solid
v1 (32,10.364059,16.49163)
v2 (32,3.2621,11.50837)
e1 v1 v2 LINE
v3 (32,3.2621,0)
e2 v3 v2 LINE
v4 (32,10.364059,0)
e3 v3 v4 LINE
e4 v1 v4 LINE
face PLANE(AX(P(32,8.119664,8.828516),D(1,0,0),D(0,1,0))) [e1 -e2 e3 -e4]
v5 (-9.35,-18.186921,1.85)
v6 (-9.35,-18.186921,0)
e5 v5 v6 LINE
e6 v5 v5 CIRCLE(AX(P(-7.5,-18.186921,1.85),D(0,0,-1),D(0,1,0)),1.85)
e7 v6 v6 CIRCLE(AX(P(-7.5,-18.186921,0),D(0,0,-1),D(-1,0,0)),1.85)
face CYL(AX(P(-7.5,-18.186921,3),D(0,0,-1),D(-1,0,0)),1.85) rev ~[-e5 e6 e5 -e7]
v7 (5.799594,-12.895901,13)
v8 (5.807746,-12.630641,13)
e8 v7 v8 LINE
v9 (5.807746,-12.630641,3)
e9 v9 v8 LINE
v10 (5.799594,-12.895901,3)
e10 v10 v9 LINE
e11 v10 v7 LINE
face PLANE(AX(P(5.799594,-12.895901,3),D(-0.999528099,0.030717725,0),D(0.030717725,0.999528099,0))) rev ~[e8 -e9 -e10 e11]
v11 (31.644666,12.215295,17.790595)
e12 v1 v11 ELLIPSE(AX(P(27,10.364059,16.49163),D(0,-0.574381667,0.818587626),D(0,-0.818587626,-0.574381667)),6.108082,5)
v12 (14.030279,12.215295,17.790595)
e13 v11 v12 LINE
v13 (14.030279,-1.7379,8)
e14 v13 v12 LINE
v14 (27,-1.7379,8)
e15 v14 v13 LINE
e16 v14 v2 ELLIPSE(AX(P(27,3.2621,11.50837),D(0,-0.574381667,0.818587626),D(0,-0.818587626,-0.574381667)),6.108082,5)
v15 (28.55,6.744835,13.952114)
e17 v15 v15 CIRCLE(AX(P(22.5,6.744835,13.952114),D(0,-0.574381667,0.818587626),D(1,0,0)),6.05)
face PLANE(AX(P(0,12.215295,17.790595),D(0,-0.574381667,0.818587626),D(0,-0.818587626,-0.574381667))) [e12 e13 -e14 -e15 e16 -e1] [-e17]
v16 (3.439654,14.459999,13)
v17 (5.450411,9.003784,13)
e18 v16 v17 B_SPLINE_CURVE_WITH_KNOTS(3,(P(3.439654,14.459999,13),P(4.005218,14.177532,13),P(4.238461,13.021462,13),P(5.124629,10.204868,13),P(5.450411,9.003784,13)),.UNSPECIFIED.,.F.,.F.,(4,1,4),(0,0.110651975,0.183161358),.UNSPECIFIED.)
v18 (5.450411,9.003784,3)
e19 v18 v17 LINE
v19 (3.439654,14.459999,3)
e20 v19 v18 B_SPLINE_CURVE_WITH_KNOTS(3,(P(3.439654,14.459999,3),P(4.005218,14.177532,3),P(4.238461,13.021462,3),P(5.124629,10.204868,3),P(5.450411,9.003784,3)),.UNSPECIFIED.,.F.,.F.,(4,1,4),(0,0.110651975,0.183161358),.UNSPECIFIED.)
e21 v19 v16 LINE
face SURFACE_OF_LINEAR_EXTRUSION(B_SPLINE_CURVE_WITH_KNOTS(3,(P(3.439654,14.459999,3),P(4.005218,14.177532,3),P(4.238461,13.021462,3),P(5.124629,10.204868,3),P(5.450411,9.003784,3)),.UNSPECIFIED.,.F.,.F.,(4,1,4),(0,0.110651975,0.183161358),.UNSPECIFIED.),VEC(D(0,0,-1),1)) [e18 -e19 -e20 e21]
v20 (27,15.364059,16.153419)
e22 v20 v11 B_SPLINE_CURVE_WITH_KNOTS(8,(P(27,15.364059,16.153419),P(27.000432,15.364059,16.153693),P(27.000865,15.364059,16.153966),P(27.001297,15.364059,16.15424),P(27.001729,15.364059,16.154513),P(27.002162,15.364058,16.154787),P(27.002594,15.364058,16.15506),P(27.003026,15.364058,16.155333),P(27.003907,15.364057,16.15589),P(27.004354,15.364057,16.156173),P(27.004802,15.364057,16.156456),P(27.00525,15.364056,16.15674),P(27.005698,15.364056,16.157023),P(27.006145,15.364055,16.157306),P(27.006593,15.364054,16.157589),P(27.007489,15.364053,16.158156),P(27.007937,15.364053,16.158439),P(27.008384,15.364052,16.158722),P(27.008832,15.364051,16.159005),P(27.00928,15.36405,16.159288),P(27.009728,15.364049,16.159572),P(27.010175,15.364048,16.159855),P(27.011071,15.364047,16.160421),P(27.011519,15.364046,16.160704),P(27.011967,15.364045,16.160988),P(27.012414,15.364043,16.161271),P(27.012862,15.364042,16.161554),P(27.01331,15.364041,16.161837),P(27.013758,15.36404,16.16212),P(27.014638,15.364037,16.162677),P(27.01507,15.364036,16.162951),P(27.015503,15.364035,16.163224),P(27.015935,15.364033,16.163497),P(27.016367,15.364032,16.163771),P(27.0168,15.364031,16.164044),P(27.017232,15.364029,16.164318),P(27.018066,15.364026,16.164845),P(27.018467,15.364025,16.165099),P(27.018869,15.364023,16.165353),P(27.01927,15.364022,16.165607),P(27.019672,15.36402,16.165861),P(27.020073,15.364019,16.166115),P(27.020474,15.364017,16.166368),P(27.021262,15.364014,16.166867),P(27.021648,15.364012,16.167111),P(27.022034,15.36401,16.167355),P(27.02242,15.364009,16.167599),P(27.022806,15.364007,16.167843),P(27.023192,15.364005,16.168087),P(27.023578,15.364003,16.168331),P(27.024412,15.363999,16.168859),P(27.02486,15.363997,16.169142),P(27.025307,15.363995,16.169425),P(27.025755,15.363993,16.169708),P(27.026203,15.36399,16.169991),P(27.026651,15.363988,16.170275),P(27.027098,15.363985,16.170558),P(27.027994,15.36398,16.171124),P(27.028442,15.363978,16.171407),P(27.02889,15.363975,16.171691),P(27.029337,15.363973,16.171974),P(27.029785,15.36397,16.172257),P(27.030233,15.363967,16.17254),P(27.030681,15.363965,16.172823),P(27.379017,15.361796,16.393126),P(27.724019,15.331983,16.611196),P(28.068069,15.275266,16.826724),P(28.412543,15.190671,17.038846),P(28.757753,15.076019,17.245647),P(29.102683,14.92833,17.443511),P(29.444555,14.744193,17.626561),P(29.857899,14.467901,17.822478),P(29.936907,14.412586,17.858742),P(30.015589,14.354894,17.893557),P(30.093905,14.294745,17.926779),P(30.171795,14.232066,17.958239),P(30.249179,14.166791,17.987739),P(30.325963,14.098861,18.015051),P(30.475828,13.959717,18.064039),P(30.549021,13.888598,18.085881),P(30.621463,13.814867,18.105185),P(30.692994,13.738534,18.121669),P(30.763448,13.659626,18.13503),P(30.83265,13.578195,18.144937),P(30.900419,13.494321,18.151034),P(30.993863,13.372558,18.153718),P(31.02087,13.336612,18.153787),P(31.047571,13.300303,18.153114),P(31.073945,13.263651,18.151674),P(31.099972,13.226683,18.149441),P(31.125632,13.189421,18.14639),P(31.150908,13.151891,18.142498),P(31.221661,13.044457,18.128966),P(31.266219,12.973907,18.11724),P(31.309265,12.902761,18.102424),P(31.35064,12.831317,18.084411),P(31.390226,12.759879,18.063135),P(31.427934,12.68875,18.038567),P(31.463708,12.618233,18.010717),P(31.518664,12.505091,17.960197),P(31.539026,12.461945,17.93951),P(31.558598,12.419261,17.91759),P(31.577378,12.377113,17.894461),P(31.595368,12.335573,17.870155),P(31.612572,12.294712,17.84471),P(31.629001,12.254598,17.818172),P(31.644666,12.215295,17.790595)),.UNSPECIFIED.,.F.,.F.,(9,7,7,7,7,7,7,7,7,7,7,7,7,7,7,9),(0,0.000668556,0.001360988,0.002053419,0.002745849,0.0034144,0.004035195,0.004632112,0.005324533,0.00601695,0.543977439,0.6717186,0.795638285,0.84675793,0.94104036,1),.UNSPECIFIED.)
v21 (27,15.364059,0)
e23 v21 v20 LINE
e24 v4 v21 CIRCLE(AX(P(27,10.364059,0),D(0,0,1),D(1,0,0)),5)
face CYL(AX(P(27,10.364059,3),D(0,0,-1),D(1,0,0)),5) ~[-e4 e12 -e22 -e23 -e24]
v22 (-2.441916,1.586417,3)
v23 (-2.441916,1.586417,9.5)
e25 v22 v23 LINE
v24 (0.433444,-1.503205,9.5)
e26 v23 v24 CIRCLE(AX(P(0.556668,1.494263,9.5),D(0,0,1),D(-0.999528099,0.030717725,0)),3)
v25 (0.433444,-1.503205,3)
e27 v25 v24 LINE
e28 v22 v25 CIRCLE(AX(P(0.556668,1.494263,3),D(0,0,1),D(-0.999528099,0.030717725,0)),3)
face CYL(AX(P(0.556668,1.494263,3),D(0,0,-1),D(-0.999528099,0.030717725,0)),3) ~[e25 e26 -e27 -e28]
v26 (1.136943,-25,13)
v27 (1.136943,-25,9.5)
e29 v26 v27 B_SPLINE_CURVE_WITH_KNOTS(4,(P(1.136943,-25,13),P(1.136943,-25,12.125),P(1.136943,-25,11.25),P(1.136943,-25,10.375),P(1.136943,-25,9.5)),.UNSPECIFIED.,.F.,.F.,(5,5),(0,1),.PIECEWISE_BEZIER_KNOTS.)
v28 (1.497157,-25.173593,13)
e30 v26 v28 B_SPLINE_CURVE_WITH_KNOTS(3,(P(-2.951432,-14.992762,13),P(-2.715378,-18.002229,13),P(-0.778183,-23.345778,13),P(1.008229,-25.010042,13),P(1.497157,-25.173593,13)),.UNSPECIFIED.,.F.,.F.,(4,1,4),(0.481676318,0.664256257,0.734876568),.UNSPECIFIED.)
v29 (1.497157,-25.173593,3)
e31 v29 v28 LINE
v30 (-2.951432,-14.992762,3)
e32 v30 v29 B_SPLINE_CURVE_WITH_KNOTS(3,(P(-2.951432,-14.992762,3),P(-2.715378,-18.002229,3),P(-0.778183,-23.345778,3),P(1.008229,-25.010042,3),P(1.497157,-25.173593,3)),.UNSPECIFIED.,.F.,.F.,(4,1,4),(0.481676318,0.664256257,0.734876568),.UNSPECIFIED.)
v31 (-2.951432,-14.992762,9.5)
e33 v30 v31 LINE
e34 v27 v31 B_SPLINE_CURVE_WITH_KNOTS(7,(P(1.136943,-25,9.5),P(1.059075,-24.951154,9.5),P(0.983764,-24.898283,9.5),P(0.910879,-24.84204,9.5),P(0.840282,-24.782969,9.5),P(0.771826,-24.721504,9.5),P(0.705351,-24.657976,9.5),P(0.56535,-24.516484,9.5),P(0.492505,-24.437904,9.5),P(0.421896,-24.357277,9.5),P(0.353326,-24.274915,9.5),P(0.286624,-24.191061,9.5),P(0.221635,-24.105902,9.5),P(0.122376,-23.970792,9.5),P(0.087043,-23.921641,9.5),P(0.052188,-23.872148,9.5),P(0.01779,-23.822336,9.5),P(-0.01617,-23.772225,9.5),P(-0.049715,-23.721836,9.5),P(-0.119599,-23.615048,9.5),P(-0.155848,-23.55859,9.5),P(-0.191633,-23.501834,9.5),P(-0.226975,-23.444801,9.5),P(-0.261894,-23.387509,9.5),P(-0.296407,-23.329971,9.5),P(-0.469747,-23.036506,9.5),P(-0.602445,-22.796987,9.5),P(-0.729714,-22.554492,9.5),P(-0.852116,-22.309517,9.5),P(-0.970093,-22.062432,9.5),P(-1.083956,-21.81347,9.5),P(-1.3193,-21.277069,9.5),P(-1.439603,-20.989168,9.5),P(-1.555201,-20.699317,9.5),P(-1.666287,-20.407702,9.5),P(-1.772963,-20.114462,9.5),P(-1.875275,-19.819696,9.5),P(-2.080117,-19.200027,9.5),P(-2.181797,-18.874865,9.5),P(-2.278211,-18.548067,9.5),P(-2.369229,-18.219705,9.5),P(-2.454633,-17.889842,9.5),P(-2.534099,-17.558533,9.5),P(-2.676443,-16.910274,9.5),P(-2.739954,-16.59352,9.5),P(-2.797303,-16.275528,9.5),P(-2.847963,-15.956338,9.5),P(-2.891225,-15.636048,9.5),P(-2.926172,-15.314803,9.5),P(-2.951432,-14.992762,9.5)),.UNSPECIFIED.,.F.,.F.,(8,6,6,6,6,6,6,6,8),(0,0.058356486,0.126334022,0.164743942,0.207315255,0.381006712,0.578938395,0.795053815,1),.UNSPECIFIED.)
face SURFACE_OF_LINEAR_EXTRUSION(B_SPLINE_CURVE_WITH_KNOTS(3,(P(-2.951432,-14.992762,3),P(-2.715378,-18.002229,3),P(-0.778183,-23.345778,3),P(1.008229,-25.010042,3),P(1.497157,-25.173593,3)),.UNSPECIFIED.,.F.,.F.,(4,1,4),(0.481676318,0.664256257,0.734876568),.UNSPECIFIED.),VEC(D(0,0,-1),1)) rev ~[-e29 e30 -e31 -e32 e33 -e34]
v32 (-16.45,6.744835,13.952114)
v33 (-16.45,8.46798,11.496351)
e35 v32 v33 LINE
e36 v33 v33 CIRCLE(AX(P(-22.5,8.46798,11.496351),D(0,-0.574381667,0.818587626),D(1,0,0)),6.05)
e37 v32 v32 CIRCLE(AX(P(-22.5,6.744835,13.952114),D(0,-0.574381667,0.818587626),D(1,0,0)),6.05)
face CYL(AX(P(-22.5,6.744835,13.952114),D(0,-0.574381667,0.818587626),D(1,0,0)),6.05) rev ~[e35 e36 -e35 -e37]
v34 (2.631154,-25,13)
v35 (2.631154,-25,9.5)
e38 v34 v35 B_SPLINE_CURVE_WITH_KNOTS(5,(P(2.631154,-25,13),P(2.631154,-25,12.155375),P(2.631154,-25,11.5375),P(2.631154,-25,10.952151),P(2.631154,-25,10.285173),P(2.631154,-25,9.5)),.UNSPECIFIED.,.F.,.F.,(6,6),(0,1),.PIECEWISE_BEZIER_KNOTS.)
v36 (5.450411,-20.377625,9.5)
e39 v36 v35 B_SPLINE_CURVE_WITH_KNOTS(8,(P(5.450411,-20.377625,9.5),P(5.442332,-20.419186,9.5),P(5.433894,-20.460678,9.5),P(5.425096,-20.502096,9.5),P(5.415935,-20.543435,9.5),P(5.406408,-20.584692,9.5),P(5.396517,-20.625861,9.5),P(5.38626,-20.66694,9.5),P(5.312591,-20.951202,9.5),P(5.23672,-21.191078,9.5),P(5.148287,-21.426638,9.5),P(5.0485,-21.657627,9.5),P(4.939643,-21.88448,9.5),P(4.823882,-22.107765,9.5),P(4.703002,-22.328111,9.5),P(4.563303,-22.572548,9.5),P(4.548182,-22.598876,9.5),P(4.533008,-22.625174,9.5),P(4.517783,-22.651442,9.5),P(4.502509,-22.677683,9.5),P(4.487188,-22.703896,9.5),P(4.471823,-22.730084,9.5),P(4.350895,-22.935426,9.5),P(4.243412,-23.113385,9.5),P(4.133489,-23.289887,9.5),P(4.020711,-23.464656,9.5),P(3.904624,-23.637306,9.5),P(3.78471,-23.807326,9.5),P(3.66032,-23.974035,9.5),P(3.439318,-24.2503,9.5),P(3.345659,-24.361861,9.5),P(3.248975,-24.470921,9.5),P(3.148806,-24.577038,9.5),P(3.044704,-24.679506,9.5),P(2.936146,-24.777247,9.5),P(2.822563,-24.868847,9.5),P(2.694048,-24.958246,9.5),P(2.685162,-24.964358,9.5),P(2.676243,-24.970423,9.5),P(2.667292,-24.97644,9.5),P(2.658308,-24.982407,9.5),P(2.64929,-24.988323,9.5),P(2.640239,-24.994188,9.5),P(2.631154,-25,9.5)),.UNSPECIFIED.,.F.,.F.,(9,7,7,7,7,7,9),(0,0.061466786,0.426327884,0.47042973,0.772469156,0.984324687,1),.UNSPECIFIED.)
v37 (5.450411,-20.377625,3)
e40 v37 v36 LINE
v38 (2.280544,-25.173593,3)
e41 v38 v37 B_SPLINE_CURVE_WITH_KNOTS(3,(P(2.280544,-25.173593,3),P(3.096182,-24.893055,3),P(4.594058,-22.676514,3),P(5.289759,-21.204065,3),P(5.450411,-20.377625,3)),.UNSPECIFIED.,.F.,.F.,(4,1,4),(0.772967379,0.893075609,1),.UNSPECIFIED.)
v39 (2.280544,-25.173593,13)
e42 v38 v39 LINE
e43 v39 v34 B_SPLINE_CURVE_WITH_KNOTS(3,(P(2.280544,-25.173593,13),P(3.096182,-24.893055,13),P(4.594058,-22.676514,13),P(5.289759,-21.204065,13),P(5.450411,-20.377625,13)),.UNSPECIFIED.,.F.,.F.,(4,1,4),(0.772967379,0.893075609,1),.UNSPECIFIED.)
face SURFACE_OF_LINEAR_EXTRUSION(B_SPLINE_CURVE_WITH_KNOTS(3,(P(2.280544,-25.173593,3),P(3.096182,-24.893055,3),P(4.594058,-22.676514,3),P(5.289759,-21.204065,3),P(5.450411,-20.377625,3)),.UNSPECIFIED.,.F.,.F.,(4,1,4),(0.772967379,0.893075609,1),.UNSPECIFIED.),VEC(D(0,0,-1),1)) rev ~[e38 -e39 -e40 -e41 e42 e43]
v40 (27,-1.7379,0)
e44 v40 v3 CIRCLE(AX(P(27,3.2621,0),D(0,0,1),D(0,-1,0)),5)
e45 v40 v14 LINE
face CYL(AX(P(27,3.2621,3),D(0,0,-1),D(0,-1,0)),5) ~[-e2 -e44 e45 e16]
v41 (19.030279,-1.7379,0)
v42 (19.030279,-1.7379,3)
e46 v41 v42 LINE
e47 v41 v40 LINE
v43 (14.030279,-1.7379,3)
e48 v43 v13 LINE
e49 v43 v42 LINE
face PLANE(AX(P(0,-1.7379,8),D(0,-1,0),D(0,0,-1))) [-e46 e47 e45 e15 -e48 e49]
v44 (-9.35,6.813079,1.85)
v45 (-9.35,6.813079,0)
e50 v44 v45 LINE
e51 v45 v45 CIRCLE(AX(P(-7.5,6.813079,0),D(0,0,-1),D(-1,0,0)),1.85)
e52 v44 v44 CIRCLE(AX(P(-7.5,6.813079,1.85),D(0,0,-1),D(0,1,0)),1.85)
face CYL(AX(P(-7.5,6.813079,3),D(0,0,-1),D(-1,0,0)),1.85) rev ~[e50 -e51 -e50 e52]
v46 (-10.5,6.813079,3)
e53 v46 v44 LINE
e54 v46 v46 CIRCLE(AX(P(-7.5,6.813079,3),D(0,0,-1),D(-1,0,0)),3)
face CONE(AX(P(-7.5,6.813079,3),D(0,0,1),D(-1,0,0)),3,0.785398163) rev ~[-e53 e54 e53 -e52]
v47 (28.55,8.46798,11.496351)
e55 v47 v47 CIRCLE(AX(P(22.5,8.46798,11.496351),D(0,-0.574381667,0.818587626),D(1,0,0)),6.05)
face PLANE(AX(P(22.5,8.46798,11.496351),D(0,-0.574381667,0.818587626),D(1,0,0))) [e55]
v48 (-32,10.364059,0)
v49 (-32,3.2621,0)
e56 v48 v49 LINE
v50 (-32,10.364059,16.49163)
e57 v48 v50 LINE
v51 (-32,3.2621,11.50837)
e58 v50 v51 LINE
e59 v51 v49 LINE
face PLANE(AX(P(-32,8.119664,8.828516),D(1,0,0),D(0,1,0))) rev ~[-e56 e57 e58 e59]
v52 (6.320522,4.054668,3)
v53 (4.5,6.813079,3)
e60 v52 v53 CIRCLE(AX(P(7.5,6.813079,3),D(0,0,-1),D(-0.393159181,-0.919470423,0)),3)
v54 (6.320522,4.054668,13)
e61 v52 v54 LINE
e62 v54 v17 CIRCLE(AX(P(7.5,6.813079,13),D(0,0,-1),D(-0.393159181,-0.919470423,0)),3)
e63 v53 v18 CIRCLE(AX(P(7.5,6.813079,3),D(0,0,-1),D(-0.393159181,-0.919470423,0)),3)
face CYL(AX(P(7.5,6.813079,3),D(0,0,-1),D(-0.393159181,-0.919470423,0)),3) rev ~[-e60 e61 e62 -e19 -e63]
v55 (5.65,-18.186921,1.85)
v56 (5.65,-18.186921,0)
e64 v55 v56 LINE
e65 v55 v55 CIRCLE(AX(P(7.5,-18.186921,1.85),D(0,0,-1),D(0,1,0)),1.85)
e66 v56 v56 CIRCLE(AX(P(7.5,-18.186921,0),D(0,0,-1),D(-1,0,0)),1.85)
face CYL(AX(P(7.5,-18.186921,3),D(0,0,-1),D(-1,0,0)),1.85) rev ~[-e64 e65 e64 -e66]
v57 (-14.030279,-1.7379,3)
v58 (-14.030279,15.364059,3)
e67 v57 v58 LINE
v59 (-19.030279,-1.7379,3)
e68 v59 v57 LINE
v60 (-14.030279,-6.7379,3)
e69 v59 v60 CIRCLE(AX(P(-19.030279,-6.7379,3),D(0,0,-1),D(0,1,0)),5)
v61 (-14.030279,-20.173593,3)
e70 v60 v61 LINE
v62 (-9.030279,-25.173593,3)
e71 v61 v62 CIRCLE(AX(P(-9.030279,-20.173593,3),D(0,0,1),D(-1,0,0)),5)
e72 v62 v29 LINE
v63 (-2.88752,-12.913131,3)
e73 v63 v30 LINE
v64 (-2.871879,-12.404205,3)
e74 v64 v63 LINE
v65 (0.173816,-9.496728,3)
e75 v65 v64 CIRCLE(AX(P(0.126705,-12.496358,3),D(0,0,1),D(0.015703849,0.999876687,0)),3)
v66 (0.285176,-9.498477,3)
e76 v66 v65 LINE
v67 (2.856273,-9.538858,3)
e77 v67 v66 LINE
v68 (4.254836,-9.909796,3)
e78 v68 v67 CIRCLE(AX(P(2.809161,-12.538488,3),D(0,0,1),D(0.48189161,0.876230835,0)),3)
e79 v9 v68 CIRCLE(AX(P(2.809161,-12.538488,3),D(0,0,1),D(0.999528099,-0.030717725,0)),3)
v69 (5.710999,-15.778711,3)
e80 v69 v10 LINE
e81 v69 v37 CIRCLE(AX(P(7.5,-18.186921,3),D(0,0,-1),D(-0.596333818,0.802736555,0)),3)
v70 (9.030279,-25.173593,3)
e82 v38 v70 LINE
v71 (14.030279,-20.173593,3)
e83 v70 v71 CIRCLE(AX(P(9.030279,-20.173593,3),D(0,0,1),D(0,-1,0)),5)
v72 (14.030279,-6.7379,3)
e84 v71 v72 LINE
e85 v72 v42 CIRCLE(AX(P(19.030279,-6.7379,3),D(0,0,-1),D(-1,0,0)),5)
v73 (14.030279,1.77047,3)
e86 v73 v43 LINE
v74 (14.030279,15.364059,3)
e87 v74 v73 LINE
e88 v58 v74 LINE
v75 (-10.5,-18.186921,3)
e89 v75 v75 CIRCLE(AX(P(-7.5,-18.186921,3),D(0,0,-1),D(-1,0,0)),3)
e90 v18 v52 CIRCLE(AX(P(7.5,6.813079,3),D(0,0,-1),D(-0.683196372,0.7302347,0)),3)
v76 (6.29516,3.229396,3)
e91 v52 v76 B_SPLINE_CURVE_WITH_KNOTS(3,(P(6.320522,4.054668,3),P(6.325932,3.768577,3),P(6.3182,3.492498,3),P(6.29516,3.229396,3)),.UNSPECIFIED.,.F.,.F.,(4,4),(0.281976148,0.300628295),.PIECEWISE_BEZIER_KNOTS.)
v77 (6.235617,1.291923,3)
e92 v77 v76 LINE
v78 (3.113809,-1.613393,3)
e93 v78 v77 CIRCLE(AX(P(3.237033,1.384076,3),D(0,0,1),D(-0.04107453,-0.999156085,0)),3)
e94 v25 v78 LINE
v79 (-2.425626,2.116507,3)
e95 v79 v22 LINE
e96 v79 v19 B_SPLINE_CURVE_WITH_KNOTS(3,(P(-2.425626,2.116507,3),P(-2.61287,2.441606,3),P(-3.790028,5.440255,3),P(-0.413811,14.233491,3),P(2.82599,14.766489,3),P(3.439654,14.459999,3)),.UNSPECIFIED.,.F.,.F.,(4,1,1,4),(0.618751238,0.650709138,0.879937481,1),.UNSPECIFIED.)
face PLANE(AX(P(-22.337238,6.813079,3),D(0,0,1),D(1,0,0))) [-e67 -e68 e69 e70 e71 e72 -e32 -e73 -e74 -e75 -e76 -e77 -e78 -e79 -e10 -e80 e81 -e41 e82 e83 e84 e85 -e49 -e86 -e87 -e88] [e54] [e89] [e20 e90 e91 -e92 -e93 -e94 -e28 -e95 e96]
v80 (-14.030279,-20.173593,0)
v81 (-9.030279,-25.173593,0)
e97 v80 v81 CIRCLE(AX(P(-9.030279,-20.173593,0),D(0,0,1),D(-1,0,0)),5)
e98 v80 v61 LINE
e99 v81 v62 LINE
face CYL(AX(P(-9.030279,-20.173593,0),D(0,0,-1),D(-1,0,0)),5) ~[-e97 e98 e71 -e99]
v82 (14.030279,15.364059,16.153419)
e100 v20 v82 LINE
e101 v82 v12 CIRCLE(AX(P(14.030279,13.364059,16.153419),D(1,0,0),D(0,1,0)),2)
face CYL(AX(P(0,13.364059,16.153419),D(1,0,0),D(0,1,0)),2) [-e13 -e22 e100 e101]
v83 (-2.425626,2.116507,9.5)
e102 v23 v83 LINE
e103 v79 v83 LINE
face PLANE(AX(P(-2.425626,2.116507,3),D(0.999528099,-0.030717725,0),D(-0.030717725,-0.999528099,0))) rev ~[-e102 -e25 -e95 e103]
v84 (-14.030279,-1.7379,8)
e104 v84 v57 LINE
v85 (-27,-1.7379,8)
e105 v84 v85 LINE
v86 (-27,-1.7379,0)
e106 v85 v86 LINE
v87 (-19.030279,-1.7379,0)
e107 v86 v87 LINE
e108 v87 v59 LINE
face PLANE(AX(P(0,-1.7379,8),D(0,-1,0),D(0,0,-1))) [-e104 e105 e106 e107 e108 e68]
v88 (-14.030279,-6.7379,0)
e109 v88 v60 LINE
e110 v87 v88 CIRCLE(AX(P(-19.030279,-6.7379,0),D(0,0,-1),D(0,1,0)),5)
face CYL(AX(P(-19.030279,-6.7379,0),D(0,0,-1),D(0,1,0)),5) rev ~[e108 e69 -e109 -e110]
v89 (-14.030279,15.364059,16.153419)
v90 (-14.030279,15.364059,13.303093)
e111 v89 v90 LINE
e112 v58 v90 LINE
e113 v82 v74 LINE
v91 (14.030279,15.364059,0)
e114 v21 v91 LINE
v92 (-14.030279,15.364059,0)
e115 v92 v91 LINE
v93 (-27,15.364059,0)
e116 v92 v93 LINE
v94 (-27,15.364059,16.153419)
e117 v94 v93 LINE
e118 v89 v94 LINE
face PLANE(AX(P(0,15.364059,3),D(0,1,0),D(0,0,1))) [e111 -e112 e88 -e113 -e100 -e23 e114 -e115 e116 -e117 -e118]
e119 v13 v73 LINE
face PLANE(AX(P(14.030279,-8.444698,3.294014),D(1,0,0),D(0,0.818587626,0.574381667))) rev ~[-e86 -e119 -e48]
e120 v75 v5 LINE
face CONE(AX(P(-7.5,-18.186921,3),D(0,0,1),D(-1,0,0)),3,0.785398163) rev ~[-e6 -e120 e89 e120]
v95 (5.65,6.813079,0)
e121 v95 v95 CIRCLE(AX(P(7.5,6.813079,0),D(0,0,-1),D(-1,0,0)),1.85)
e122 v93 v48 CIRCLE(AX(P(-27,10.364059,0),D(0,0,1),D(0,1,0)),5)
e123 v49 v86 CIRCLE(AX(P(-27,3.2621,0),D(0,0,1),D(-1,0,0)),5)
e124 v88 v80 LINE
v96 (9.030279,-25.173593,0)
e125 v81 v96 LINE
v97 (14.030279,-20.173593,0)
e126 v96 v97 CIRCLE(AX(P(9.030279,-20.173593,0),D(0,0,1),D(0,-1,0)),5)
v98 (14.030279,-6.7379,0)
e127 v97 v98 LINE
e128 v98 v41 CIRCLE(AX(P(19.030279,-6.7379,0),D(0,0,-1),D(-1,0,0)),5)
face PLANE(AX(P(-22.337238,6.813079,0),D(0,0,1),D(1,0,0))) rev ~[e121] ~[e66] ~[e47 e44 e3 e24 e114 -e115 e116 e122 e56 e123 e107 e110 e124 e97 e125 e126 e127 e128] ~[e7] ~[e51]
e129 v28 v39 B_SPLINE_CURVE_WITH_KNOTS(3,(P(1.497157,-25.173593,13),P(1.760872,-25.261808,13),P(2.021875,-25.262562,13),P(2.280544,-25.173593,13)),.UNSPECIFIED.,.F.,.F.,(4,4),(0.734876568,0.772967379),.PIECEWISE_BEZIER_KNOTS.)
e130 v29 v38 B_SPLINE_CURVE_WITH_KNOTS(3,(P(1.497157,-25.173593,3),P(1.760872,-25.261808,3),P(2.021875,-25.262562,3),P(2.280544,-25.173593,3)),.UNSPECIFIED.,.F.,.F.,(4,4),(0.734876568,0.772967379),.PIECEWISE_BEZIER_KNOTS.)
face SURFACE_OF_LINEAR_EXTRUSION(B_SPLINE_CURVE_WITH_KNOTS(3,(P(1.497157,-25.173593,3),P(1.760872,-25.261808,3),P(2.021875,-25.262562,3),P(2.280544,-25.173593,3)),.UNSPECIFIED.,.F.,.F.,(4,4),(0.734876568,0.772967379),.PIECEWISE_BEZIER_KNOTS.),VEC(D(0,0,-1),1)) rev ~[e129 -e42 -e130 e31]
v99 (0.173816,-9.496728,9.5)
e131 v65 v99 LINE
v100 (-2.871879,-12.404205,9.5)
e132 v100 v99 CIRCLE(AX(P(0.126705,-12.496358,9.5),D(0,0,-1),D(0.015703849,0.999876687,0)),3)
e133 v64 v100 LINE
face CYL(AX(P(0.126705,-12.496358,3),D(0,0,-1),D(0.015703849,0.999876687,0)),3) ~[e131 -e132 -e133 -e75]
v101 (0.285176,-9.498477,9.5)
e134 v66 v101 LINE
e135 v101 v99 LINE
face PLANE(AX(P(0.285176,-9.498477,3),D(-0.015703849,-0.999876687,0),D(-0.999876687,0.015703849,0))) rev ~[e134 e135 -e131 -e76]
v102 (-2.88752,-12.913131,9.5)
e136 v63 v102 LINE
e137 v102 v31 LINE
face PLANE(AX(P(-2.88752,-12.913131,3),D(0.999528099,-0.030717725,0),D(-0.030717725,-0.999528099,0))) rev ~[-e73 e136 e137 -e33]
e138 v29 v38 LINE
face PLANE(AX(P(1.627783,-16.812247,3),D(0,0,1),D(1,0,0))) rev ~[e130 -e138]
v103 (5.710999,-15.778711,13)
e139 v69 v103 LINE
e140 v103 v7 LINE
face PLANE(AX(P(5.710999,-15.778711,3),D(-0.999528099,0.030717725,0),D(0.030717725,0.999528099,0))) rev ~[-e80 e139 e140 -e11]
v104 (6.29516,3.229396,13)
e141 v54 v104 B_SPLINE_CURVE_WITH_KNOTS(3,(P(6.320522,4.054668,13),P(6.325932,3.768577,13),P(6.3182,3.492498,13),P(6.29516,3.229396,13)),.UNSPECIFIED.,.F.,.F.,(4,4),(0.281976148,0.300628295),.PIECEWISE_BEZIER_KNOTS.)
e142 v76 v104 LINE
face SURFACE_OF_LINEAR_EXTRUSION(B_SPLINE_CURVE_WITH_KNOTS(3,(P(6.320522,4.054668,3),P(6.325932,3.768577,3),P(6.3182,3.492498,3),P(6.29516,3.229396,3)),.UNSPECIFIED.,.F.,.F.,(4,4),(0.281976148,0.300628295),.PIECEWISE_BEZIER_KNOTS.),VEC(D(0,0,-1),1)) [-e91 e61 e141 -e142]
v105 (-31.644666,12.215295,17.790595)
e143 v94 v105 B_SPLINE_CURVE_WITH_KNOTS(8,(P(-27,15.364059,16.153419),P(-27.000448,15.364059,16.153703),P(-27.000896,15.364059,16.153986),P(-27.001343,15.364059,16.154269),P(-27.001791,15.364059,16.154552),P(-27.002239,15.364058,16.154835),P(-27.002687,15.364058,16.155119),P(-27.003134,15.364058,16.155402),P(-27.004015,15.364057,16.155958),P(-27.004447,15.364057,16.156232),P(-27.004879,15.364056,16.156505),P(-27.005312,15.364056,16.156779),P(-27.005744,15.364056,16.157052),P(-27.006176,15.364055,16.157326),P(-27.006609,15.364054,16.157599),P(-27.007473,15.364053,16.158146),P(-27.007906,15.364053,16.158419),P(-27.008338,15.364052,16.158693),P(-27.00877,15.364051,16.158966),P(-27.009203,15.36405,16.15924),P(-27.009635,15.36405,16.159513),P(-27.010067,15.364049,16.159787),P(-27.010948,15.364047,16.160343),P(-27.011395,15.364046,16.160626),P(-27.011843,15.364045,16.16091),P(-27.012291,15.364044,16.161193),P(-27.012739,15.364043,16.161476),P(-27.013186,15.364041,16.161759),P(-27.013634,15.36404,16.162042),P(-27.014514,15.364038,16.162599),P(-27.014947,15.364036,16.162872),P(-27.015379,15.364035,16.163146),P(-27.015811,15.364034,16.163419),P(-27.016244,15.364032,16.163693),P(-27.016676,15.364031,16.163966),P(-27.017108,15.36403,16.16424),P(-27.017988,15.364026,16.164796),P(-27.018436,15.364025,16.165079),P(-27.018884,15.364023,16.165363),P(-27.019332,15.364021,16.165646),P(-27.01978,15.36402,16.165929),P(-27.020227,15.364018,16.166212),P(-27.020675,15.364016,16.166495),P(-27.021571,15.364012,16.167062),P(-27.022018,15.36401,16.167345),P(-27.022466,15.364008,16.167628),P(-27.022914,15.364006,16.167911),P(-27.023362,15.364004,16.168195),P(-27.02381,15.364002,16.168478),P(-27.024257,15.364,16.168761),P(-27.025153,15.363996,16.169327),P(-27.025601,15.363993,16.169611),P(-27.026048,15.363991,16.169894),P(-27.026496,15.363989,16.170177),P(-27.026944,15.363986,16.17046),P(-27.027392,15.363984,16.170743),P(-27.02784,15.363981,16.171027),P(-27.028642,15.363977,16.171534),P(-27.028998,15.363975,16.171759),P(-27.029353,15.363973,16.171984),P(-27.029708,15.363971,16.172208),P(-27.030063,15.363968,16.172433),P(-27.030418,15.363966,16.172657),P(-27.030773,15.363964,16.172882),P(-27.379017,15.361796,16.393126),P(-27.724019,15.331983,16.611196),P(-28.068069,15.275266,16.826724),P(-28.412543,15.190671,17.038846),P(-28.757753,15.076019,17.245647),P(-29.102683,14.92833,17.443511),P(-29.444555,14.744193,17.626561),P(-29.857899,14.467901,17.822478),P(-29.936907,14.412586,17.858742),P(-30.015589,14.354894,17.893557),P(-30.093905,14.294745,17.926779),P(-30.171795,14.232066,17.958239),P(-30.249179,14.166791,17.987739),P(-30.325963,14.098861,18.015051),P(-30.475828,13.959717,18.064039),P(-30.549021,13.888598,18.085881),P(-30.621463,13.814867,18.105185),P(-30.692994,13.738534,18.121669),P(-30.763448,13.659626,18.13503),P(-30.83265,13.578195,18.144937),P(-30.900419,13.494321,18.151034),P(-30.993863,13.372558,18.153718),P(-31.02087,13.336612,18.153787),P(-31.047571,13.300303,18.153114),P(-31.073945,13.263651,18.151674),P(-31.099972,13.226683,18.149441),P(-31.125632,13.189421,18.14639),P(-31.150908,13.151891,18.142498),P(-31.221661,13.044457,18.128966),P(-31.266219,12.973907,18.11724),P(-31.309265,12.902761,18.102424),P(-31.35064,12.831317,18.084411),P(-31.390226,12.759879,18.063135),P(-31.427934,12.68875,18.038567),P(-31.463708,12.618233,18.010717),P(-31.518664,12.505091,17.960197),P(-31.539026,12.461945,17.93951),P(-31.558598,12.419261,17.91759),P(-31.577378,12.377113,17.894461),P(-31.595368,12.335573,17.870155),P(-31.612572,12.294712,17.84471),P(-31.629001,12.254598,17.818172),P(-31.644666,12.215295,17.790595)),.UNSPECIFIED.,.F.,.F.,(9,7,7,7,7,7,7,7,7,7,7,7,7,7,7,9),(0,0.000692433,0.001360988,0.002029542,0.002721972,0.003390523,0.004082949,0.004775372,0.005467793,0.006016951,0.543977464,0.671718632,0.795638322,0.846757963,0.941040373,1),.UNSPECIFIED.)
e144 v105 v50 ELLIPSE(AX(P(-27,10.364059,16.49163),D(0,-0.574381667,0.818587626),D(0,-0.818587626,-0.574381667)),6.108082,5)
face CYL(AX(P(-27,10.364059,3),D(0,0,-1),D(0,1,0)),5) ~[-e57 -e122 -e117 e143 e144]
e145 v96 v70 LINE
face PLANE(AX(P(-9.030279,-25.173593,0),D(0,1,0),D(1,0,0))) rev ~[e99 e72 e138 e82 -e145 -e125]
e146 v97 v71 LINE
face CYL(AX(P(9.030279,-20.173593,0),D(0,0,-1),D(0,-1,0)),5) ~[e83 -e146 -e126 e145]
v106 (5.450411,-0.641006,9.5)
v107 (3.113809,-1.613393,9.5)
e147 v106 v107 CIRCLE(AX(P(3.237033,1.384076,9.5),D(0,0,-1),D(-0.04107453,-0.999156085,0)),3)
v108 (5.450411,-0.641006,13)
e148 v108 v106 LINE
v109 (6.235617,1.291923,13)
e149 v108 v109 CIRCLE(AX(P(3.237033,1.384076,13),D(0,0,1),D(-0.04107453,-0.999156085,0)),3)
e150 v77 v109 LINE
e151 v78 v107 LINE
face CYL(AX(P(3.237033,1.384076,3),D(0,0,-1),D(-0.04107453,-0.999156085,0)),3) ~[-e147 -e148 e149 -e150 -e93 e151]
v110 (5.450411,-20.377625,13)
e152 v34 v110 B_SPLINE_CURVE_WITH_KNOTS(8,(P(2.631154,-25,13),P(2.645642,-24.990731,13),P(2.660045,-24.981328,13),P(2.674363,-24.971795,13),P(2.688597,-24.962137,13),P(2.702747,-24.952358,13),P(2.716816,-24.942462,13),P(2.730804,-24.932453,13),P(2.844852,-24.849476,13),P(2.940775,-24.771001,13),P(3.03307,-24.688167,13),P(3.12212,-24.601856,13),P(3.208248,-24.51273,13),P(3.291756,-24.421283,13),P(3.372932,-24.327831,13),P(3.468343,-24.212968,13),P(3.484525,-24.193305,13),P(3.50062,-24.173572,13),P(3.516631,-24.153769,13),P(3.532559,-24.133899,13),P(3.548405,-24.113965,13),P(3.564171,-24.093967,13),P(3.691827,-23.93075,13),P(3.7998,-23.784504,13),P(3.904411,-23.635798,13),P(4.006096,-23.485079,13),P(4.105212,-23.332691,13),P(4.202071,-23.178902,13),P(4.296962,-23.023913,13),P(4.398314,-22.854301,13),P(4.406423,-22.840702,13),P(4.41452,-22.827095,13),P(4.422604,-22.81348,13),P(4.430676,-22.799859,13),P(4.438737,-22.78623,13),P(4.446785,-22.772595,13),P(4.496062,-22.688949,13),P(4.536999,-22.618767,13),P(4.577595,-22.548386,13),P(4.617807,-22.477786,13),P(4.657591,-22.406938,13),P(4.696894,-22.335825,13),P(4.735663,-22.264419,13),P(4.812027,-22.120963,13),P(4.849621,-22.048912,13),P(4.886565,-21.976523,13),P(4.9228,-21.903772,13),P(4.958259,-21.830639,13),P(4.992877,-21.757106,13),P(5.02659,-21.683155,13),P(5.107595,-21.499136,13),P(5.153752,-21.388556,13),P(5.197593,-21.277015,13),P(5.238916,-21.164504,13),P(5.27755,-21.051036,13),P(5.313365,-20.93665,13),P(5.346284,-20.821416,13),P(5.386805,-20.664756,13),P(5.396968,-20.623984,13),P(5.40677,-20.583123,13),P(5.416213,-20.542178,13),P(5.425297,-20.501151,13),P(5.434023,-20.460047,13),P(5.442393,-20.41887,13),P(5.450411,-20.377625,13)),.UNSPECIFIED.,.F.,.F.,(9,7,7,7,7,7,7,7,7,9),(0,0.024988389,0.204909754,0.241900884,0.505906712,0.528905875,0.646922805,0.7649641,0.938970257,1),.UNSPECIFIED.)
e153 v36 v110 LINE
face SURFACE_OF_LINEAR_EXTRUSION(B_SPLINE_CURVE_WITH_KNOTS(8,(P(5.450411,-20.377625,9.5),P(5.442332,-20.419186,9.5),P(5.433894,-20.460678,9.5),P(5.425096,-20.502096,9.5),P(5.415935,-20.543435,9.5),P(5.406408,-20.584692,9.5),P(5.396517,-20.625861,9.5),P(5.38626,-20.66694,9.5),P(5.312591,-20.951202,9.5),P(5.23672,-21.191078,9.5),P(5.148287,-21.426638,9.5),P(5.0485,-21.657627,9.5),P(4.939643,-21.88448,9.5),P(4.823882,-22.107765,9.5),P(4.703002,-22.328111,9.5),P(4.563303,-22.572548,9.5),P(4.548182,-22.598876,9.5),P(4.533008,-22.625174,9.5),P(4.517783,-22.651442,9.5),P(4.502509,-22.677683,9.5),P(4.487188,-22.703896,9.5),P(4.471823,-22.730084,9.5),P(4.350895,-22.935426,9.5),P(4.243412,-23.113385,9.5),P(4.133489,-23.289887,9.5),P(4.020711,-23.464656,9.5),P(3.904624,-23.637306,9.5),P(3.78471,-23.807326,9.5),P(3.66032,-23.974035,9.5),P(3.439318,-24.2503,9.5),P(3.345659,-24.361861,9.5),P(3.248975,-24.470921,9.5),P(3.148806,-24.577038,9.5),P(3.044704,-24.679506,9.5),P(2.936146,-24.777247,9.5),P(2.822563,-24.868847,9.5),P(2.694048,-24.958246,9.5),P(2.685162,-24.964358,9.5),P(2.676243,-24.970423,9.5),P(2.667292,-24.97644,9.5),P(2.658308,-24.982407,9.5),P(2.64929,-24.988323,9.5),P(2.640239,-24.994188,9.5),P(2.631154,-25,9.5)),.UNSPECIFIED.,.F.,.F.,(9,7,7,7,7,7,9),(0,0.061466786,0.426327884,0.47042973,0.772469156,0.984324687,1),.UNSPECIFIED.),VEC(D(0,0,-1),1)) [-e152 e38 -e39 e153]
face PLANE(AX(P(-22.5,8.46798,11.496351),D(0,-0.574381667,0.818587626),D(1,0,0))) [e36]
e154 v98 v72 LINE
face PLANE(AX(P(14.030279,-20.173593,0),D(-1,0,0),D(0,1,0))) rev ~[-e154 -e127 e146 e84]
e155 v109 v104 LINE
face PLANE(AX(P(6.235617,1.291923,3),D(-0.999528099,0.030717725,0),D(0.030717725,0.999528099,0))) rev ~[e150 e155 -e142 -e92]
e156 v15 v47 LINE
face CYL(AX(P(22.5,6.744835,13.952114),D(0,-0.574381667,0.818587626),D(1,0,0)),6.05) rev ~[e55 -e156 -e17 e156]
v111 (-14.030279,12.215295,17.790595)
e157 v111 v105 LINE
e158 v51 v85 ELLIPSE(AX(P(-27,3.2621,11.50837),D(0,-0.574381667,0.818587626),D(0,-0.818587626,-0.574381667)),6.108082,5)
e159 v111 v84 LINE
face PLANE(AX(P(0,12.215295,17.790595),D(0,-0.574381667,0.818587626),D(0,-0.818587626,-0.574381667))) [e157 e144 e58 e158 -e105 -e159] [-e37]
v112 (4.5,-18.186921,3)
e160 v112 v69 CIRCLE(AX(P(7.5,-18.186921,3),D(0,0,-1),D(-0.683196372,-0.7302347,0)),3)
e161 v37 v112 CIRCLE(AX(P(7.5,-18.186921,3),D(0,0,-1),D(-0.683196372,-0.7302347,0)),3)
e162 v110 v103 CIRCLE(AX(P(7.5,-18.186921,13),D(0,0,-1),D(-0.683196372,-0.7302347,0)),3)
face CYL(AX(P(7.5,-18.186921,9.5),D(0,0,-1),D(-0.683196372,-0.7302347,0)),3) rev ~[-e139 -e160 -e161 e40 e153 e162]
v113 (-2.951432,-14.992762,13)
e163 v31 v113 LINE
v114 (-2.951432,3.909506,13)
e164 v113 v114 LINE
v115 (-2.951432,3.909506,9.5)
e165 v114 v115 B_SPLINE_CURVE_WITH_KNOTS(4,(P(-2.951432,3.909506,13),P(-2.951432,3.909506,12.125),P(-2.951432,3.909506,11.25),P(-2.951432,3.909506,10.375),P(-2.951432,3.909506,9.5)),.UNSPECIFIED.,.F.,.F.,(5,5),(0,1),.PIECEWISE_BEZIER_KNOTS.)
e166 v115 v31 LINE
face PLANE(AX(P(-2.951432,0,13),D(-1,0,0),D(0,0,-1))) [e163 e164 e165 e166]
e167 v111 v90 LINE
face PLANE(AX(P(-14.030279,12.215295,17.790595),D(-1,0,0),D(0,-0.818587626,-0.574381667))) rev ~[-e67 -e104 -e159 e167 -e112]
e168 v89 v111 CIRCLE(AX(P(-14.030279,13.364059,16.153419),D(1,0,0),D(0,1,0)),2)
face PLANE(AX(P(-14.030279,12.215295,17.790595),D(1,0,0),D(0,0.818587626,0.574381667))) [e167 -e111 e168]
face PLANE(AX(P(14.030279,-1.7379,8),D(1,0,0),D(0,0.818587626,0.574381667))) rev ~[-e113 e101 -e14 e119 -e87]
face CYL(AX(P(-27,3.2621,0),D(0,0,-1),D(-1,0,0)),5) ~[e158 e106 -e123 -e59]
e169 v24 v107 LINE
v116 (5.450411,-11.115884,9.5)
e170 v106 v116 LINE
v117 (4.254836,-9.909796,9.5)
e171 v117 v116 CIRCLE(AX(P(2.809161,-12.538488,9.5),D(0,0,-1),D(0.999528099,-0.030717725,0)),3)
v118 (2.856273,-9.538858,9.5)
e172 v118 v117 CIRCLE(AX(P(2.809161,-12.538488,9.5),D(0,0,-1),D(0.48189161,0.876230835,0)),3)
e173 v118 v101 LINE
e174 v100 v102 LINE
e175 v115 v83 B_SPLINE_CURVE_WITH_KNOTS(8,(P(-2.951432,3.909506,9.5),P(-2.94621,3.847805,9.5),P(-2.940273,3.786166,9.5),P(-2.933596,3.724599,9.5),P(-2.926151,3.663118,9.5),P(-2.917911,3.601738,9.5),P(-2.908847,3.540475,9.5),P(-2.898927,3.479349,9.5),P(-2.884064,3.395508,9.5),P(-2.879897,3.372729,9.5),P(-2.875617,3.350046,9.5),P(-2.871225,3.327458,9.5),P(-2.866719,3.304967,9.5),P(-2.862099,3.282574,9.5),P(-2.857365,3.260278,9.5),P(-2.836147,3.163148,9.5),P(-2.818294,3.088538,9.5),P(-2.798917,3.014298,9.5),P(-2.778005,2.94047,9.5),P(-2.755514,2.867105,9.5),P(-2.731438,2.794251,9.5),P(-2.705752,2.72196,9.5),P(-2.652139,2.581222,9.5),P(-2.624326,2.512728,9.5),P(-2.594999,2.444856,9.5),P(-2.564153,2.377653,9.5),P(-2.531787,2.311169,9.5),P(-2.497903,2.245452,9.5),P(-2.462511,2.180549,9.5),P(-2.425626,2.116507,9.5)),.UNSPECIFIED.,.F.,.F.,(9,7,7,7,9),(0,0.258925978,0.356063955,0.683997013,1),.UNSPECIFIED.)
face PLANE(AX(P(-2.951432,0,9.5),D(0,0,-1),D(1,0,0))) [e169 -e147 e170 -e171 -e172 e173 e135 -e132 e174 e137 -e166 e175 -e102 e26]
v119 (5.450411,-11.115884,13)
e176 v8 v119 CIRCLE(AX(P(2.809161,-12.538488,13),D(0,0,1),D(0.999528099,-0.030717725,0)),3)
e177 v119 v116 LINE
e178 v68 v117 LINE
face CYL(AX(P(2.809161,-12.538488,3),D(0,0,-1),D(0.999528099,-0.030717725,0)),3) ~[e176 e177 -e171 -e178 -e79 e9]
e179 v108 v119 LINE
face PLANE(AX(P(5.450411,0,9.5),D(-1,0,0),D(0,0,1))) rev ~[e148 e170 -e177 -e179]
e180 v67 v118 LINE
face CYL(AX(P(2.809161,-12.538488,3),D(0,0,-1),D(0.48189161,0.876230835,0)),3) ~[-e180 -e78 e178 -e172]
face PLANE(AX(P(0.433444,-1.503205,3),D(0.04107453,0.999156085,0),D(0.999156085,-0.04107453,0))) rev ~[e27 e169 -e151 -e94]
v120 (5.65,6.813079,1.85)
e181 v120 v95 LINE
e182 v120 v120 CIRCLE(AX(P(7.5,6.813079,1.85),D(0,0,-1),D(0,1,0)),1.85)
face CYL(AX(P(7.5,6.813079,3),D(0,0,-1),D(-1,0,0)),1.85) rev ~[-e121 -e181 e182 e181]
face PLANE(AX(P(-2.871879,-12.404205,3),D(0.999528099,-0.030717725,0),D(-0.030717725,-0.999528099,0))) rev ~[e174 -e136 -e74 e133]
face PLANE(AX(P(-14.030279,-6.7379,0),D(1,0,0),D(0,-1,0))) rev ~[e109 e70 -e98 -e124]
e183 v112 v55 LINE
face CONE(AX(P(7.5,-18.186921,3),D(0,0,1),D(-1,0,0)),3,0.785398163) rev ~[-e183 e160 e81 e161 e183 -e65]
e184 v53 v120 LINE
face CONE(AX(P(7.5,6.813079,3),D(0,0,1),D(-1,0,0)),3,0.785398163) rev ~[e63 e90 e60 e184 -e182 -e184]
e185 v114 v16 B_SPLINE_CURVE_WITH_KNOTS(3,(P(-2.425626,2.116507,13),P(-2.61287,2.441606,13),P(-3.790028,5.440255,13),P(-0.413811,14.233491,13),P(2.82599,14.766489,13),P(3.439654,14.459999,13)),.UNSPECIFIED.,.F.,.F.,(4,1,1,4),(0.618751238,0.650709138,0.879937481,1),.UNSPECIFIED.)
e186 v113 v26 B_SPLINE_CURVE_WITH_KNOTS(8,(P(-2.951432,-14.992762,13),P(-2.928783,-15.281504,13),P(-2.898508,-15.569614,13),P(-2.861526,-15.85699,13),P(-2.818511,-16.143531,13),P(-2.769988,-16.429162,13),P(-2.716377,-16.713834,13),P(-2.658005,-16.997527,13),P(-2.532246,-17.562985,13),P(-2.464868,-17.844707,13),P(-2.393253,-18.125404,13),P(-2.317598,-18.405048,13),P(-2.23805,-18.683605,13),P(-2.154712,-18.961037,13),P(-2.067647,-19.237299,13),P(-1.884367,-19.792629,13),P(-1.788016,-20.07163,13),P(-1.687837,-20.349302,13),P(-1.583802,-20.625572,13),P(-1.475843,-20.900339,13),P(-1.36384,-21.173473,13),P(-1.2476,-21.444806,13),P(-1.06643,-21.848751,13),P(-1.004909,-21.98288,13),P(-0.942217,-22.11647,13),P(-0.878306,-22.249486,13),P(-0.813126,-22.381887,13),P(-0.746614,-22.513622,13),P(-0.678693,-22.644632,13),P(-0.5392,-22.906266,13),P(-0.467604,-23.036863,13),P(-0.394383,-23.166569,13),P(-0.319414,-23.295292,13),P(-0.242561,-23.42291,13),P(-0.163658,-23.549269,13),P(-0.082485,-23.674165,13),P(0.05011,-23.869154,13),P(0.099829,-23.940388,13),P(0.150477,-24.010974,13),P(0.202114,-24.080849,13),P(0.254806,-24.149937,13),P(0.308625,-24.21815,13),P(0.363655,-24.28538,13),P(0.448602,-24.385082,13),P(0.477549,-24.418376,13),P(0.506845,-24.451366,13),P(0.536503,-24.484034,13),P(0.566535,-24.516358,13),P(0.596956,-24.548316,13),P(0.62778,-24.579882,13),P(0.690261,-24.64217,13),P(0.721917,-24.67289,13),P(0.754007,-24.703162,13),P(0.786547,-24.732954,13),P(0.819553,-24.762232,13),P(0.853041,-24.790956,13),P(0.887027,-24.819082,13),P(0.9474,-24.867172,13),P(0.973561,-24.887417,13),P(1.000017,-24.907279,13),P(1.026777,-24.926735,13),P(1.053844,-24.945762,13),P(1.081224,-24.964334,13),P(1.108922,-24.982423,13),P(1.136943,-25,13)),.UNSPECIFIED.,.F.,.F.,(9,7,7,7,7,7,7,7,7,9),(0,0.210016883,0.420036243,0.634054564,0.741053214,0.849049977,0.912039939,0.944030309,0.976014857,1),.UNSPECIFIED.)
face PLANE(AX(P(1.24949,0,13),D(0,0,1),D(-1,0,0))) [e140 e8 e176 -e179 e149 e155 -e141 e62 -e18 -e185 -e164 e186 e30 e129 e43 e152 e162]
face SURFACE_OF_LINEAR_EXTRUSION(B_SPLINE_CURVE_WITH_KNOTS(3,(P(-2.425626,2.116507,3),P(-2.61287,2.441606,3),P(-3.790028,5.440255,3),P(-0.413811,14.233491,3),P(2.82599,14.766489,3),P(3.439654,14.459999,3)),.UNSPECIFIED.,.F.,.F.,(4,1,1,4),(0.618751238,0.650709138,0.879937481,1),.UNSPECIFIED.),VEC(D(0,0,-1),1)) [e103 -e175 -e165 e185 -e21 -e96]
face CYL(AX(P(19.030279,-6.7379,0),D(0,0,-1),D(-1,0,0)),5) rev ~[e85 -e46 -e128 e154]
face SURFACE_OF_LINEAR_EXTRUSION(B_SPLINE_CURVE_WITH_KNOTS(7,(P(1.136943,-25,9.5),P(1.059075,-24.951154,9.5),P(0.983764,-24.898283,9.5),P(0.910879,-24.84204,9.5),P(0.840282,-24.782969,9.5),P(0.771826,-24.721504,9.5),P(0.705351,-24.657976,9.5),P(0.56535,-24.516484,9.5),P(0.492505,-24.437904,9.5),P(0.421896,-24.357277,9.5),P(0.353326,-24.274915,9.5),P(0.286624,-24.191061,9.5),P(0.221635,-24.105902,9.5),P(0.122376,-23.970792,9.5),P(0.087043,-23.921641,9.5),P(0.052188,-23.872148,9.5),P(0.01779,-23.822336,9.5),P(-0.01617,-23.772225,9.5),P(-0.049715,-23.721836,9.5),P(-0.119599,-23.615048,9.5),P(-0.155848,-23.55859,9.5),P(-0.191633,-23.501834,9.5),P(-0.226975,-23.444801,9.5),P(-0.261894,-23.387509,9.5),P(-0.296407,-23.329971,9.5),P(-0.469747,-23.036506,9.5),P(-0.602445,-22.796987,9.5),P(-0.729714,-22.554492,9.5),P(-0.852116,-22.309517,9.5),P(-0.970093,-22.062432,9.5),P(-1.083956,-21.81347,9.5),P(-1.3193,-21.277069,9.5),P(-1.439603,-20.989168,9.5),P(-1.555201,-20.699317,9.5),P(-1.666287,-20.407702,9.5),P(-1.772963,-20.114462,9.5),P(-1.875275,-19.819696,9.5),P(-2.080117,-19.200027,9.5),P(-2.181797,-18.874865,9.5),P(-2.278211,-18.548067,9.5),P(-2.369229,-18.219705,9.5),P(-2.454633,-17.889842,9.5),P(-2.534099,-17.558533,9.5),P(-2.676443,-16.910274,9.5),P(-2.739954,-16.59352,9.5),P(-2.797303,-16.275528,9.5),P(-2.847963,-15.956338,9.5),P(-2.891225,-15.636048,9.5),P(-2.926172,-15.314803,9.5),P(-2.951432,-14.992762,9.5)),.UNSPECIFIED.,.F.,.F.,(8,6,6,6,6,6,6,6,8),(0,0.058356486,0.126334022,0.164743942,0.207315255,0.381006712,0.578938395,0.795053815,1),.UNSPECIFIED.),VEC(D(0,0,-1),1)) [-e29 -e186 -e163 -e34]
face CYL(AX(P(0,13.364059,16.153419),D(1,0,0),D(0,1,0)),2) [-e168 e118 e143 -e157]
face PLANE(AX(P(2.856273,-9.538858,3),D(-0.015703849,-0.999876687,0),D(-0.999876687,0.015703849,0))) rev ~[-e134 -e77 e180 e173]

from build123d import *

# Parameters (mm, degrees)
F0_W            = 28.0605573207
F0_H            = 17.1019586477
F1_DEPTH        = 3
F3_DEPTH        = 32
F3_DEPTH_BACK   = 32
F4_DEPTH        = 25
F5_W            = 28.0605573207
F5_H            = 17.0454510609
F5_H_2          = 8.3564384666
F6_REACH        = 49.2047839512
F5_R            = 6.05
F7_DEPTH        = 3
F9_DEPTH        = 10
F10_D           = 3.7
F10_CSINK_D     = 6
F10_CSINK_ANGLE = 90
F12_DEPTH       = 25
F13_DEPTH       = 25
F14_DEPTH       = 5


# Not quite as in the source:
# - a feature names something its author has since deleted; it is built from what else it names


with BuildPart() as f1:
    # F0 (on Top) → F1 (new body)
    with BuildSketch(Plane.XY):
        with BuildLine():
            Line((-19.0302786604, -1.7378998397), (-14.0302786604, -1.7378998397))
            Line((-14.0302786604, -1.7378998397), (-14.0302786604, 15.3640588081))
            Line((-14.0302786604, 15.3640588081), (-27, 15.3640588081))
            ThreePointArc((-27, 15.3640588081), (-30.5355339059, 13.899592714), (-32, 10.3640588081))
            Line((-32, 10.3640588081), (-32, 3.2621001603))
            ThreePointArc((-32, 3.2621001603), (-30.5355339059, -0.2734337456), (-27, -1.7378998397))
            Line((-27, -1.7378998397), (-20.8602603525, -1.7378998397))
            Line((-20.8602603525, -1.7378998397), (-19.0302786604, -1.7378998397))
        make_face()
        with BuildLine():
            ThreePointArc((-14.0302786604, -20.1735929717), (-12.5658125663, -23.7091268776), (-9.0302786604, -25.1735929717))
            Line((-9.0302786604, -25.1735929717), (9.0302786604, -25.1735929717))
            ThreePointArc((9.0302786604, -25.1735929717), (12.5658125663, -23.7091268776), (14.0302786604, -20.1735929717))
            Line((14.0302786604, -20.1735929717), (14.0302786604, -6.7378998397))
            Line((14.0302786604, -6.7378998397), (14.0302786604, -1.7378998397))
            Line((14.0302786604, -1.7378998397), (-14.0302786604, -1.7378998397))
            Line((-14.0302786604, -1.7378998397), (-14.0302786604, -6.7378998397))
            Line((-14.0302786604, -6.7378998397), (-14.0302786604, -20.1735929717))
        make_face()
        with BuildLine():
            Line((14.0302786604, 15.3640588081), (14.0302786604, -1.7378998397))
            Line((14.0302786604, -1.7378998397), (19.0302786604, -1.7378998397))
            Line((19.0302786604, -1.7378998397), (21.6872710735, -1.7378998397))
            Line((21.6872710735, -1.7378998397), (27, -1.7378998397))
            ThreePointArc((27, -1.7378998397), (30.5355339059, -0.2734337456), (32, 3.2621001603))
            Line((32, 3.2621001603), (32, 10.3640588081))
            ThreePointArc((32, 10.3640588081), (30.5355339059, 13.899592714), (27, 15.3640588081))
            Line((27, 15.3640588081), (14.0302786604, 15.3640588081))
        make_face()
        with Locations((0, 6.8130794842)):
            Rectangle(F0_W, F0_H)
        with BuildLine():
            ThreePointArc((-19.0302786604, -1.7378998397), (-15.4947447544, -3.2023659338), (-14.0302786604, -6.7378998397))
            Line((-14.0302786604, -6.7378998397), (-14.0302786604, -1.7378998397))
            Line((-14.0302786604, -1.7378998397), (-19.0302786604, -1.7378998397))
        make_face()
        with BuildLine():
            Line((14.0302786604, -1.7378998397), (14.0302786604, -6.7378998397))
            ThreePointArc((14.0302786604, -6.7378998397), (15.4947447544, -3.2023659338), (19.0302786604, -1.7378998397))
            Line((19.0302786604, -1.7378998397), (14.0302786604, -1.7378998397))
        make_face()
    extrude(amount=F1_DEPTH)

    # F2 (on Right) → F3 (join, two sides)
    with BuildSketch(Plane.YZ) as f3_sk:
        with BuildLine():
            Line((-1.7378998397, 8), (-1.7378998397, 3))
            Line((-1.7378998397, 3), (15.3640588081, 3))
            Line((15.3640588081, 3), (15.3640588081, 16.1534193361))
            ThreePointArc((15.3640588081, 16.1534193361), (14.2866836868, 17.9278948454), (12.2152954749, 17.7905945877))
            Line((12.2152954749, 17.7905945877), (-1.7378998397, 8))
        make_face()
    extrude(amount=F3_DEPTH)
    extrude(f3_sk.sketch, amount=-F3_DEPTH_BACK)

    # F4 (cut): faces of the model
    f4_faces = [f1.faces().sort_by_distance(p)[0] for p in [
        (-30.8831603053, 14.2472191133, 3),
        (-30.8831603053, -0.621060145, 3),
        (30.8831603053, -0.621060145, 3),
        (30.8831603053, 14.2472191133, 3),
    ]]
    extrude(f4_faces, amount=-F4_DEPTH, mode=Mode.SUBTRACT)

    f6_end = Plane(origin=(0, -13.1098018859, 3), x_dir=(1, 0, 0), z_dir=(0, 0, 1))
    # F5 (on face) → F6 (cut, up to a plane its end follows)
    with BuildSketch(Plane(origin=(0, -4.334811805, 6.177814353), x_dir=(1, 0, 0), z_dir=(0, -0.5743816666, 0.8185876258))):
        with Locations((0, 11.6951555593)):
            Rectangle(F5_W, F5_H)
        Polygon((14.0302786604, -5.0207045861), (14.0302786604, 0), (14.0302786604, 3.1724300289), (-14.0302786604, 3.1724300289), (-14.0302786604, 0), (-14.0302786604, -5.0207045861), align=None)
        with Locations((0, 24.396100323)):
            Rectangle(F5_W, F5_H_2)
    f6_long = extrude(amount=-F6_REACH, mode=Mode.PRIVATE)
    add(split(f6_long, bisect_by=f6_end, keep=Keep.TOP, mode=Mode.PRIVATE), mode=Mode.SUBTRACT)

    # F5 (on face) → F7 (cut)
    with BuildSketch(Plane(origin=(0, -4.334811805, 6.177814353), x_dir=(1, 0, 0), z_dir=(0, -0.5743816666, 0.8185876258))):
        with Locations((22.5, 13.5350767523)):
            Circle(F5_R)
        with Locations((-22.5, 13.5350767523)):
            Circle(F5_R)
    extrude(amount=-F7_DEPTH, mode=Mode.SUBTRACT)

    # F8 (on face) → F9 (join)
    with BuildSketch(Plane.XY.offset(3)):
        with BuildLine():
            add(Edge.make_bspline(
                [(3.439653721, 14.4599989291), (4.0052184257, 14.1775319538), (4.2384614527, 13.0214622017), (5.1246291924, 10.2048677906), (5.4504108833, 9.003783584)],
                knots=[0, 0, 0, 0, 0.1106519752, 0.1831613583, 0.1831613583, 0.1831613583, 0.1831613583], degree=3))
            add(Edge.make_bspline(
                [(-2.425625543, 2.1165073176), (-2.6128697036, 2.4416064205), (-3.7900282508, 5.4402549428), (-0.4138105091, 14.2334908767), (2.8259898176, 14.7664886821), (3.439653721, 14.4599989291)],
                knots=[0.6187512381, 0.6187512381, 0.6187512381, 0.6187512381, 0.6507091383, 0.8799374811, 1, 1, 1, 1], degree=3))
            add(Edge.make_bspline(
                [(6.2951599905, 3.2293955823), (6.2536285053, 2.7551424943), (5.7362561971, 0.3058795284), (1.5238317893, -0.5897867433), (-1.6783380052, 0.8190435823), (-2.425625543, 2.1165073176)],
                knots=[0.3006282955, 0.3006282955, 0.3006282955, 0.3006282955, 0.3342495888, 0.491207925, 0.6187512381, 0.6187512381, 0.6187512381, 0.6187512381], degree=3))
            Line((6.2951599905, 3.2293955823), (6.3205224566, 4.054668216))
            ThreePointArc((6.3205224566, 4.054668216), (4.5453166658, 6.2936120697), (5.4504108833, 9.003783584))
        make_face()
        with BuildLine():
            add(Edge.make_bspline(
                [(6.2951599905, 3.2293955823), (6.2536285053, 2.7551424943), (5.7362561971, 0.3058795284), (1.5238317893, -0.5897867433), (-1.6783380052, 0.8190435823), (-2.425625543, 2.1165073176)],
                knots=[0.3006282955, 0.3006282955, 0.3006282955, 0.3006282955, 0.3342495888, 0.491207925, 0.6187512381, 0.6187512381, 0.6187512381, 0.6187512381], degree=3))
            Line((-2.425625543, 2.1165073176), (-2.4419164115, 1.5864165937))
            ThreePointArc((-2.4419164115, 1.5864165937), (-1.6394334925, -0.5495415445), (0.4334442969, -1.5032048363))
            Line((0.4334442969, -1.5032048363), (3.1138092408, -1.6133925553))
            ThreePointArc((3.1138092408, -1.6133925553), (5.2808377949, -0.8120256781), (6.2356171285, 1.2919225271))
            Line((6.2356171285, 1.2919225271), (6.2951599905, 3.2293955823))
        make_face()
        with BuildLine():
            add(Edge.make_bspline(
                [(6.3205224566, 4.054668216), (6.3259320308, 3.7685769845), (6.3182004896, 3.4924978464), (6.2951599905, 3.2293955823)],
                knots=[0.2819761483, 0.2819761483, 0.2819761483, 0.2819761483, 0.3006282955, 0.3006282955, 0.3006282955, 0.3006282955], degree=3))
            Line((6.3205224566, 4.054668216), (6.2951599905, 3.2293955823))
        make_face()
        with BuildLine():
            Line((5.7109985458, -15.7787108495), (5.7995937264, -12.895900563))
            add(Edge.make_bspline(
                [(5.7995937264, -12.895900563), (5.6014543432, -11.957203972), (5.2341196587, -10.747475142), (4.4402012509, -10.0397747357), (4.2548362634, -9.909795659)],
                knots=[0.078280994, 0.078280994, 0.078280994, 0.078280994, 0.1532878364, 0.173703161, 0.173703161, 0.173703161, 0.173703161], degree=3))
            ThreePointArc((4.2548362634, -9.909795659), (3.5782527554, -9.6387470487), (2.8562729835, -9.5388581041))
            Line((2.8562729835, -9.5388581041), (0.2851764489, -9.4984770116))
            add(Edge.make_bspline(
                [(0.2851764489, -9.4984770116), (0.1886962517, -9.5257281074), (-1.4223255568, -10.024145371), (-2.5699293228, -11.1174611467), (-2.8875198131, -12.9131313678)],
                knots=[0.2910251466, 0.2910251466, 0.2910251466, 0.2910251466, 0.2995550952, 0.4354391583, 0.4354391583, 0.4354391583, 0.4354391583], degree=3))
            Line((-2.8875198131, -12.9131313678), (-2.9514315077, -14.9927624413))
            add(Edge.make_bspline(
                [(-2.9514315077, -14.9927624413), (-2.7153775465, -18.0022293403), (-0.7781826645, -23.3457780002), (1.0082290092, -25.0100423947), (1.4971567675, -25.1735929717)],
                knots=[0.4816763185, 0.4816763185, 0.4816763185, 0.4816763185, 0.6642562574, 0.7348765677, 0.7348765677, 0.7348765677, 0.7348765677], degree=3))
            Line((1.4971567675, -25.1735929717), (2.2805444633, -25.1735929717))
            add(Edge.make_bspline(
                [(2.2805444633, -25.1735929717), (3.0961818535, -24.8930551973), (4.5940584593, -22.6765141), (5.2897590721, -21.2040650633), (5.4504108833, -20.3776246156)],
                knots=[0.7729673791, 0.7729673791, 0.7729673791, 0.7729673791, 0.8930756087, 1, 1, 1, 1], degree=3))
            ThreePointArc((5.4504108833, -20.3776246156), (4.5048044555, -18.0172041338), (5.7109985458, -15.7787108495))
        make_face()
        with BuildLine():
            add(Edge.make_bspline(
                [(5.7995937264, -12.895900563), (5.6014543432, -11.957203972), (5.2341196587, -10.747475142), (4.4402012509, -10.0397747357), (4.2548362634, -9.909795659)],
                knots=[0.078280994, 0.078280994, 0.078280994, 0.078280994, 0.1532878364, 0.173703161, 0.173703161, 0.173703161, 0.173703161], degree=3))
            Line((5.7995937264, -12.895900563), (5.8077457332, -12.6306413387))
            ThreePointArc((5.8077457332, -12.6306413387), (5.414657568, -11.0514138893), (4.2548362634, -9.909795659))
        make_face()
        with BuildLine():
            add(Edge.make_bspline(
                [(0.2851764489, -9.4984770116), (0.1886962517, -9.5257281074), (-1.4223255568, -10.024145371), (-2.5699293228, -11.1174611467), (-2.8875198131, -12.9131313678)],
                knots=[0.2910251466, 0.2910251466, 0.2910251466, 0.2910251466, 0.2995550952, 0.4354391583, 0.4354391583, 0.4354391583, 0.4354391583], degree=3))
            Line((0.2851764489, -9.4984770116), (0.173816477, -9.4967280157))
            ThreePointArc((0.173816477, -9.4967280157), (-1.9448049821, -10.32637036), (-2.8718793694, -12.4042049027))
            Line((-2.8718793694, -12.4042049027), (-2.8875198131, -12.9131313678))
        make_face()
        with BuildLine():
            add(Edge.make_bspline(
                [(1.4971567675, -25.1735929717), (1.7608720486, -25.2618080212), (2.0218753444, -25.2625619913), (2.2805444633, -25.1735929717)],
                knots=[0.7348765677, 0.7348765677, 0.7348765677, 0.7348765677, 0.7729673791, 0.7729673791, 0.7729673791, 0.7729673791], degree=3))
            Line((2.2805444633, -25.1735929717), (1.4971567675, -25.1735929717))
        make_face()
    extrude(amount=F9_DEPTH)

    # F10 (through all)
    with Locations(Plane.XY.offset(3)):
        with Locations((-7.5, 6.8130794842), (-7.5, -18.1869205158), (7.5, 6.8130794842), (7.5, -18.1869205158)):
            CounterSinkHole(F10_D / 2, F10_CSINK_D / 2, counter_sink_angle=F10_CSINK_ANGLE)

    # F11 (on Front) → F12 (join)
    with BuildSketch(Plane.XZ):
        with BuildLine():
            Line((-2.9514315077, 9.5), (5.4504108833, 9.5))
            Line((5.4504108833, 9.5), (5.4504108833, 13))
            add(Edge.make_bspline(
                [(5.4504108833, 13), (2.649796753, 13), (-0.1508173774, 13), (-2.9514315077, 13)],
                knots=[0.0010524799, 0.0010524799, 0.0010524799, 0.0010524799, 0.9996431059, 0.9996431059, 0.9996431059, 0.9996431059], degree=3))
            Line((-2.9514315077, 13), (-2.9514315077, 9.5))
        make_face()
    extrude(amount=F12_DEPTH)

    # F13 (cut): faces of the model
    f13_faces = [f1.faces().sort_by_distance(p)[0] for p in [
        (-1.8145257216, -22.2530122303, 9.5),
        (4.6195780711, -23.6613899314, 9.5),
        (5.0645605364, -18.1869205158, 9.5),
        (4.6195780711, -23.6613899314, 9.5),
    ]]
    extrude(f13_faces, amount=-F13_DEPTH, mode=Mode.SUBTRACT)

    # F14 (add): a face of the model
    f14_faces = [f1.faces().sort_by_distance(p)[0] for p in [
        (-2.4980717075, 0, 11.25),
    ]]
    extrude(f14_faces, amount=F14_DEPTH)


solid = f1.part
